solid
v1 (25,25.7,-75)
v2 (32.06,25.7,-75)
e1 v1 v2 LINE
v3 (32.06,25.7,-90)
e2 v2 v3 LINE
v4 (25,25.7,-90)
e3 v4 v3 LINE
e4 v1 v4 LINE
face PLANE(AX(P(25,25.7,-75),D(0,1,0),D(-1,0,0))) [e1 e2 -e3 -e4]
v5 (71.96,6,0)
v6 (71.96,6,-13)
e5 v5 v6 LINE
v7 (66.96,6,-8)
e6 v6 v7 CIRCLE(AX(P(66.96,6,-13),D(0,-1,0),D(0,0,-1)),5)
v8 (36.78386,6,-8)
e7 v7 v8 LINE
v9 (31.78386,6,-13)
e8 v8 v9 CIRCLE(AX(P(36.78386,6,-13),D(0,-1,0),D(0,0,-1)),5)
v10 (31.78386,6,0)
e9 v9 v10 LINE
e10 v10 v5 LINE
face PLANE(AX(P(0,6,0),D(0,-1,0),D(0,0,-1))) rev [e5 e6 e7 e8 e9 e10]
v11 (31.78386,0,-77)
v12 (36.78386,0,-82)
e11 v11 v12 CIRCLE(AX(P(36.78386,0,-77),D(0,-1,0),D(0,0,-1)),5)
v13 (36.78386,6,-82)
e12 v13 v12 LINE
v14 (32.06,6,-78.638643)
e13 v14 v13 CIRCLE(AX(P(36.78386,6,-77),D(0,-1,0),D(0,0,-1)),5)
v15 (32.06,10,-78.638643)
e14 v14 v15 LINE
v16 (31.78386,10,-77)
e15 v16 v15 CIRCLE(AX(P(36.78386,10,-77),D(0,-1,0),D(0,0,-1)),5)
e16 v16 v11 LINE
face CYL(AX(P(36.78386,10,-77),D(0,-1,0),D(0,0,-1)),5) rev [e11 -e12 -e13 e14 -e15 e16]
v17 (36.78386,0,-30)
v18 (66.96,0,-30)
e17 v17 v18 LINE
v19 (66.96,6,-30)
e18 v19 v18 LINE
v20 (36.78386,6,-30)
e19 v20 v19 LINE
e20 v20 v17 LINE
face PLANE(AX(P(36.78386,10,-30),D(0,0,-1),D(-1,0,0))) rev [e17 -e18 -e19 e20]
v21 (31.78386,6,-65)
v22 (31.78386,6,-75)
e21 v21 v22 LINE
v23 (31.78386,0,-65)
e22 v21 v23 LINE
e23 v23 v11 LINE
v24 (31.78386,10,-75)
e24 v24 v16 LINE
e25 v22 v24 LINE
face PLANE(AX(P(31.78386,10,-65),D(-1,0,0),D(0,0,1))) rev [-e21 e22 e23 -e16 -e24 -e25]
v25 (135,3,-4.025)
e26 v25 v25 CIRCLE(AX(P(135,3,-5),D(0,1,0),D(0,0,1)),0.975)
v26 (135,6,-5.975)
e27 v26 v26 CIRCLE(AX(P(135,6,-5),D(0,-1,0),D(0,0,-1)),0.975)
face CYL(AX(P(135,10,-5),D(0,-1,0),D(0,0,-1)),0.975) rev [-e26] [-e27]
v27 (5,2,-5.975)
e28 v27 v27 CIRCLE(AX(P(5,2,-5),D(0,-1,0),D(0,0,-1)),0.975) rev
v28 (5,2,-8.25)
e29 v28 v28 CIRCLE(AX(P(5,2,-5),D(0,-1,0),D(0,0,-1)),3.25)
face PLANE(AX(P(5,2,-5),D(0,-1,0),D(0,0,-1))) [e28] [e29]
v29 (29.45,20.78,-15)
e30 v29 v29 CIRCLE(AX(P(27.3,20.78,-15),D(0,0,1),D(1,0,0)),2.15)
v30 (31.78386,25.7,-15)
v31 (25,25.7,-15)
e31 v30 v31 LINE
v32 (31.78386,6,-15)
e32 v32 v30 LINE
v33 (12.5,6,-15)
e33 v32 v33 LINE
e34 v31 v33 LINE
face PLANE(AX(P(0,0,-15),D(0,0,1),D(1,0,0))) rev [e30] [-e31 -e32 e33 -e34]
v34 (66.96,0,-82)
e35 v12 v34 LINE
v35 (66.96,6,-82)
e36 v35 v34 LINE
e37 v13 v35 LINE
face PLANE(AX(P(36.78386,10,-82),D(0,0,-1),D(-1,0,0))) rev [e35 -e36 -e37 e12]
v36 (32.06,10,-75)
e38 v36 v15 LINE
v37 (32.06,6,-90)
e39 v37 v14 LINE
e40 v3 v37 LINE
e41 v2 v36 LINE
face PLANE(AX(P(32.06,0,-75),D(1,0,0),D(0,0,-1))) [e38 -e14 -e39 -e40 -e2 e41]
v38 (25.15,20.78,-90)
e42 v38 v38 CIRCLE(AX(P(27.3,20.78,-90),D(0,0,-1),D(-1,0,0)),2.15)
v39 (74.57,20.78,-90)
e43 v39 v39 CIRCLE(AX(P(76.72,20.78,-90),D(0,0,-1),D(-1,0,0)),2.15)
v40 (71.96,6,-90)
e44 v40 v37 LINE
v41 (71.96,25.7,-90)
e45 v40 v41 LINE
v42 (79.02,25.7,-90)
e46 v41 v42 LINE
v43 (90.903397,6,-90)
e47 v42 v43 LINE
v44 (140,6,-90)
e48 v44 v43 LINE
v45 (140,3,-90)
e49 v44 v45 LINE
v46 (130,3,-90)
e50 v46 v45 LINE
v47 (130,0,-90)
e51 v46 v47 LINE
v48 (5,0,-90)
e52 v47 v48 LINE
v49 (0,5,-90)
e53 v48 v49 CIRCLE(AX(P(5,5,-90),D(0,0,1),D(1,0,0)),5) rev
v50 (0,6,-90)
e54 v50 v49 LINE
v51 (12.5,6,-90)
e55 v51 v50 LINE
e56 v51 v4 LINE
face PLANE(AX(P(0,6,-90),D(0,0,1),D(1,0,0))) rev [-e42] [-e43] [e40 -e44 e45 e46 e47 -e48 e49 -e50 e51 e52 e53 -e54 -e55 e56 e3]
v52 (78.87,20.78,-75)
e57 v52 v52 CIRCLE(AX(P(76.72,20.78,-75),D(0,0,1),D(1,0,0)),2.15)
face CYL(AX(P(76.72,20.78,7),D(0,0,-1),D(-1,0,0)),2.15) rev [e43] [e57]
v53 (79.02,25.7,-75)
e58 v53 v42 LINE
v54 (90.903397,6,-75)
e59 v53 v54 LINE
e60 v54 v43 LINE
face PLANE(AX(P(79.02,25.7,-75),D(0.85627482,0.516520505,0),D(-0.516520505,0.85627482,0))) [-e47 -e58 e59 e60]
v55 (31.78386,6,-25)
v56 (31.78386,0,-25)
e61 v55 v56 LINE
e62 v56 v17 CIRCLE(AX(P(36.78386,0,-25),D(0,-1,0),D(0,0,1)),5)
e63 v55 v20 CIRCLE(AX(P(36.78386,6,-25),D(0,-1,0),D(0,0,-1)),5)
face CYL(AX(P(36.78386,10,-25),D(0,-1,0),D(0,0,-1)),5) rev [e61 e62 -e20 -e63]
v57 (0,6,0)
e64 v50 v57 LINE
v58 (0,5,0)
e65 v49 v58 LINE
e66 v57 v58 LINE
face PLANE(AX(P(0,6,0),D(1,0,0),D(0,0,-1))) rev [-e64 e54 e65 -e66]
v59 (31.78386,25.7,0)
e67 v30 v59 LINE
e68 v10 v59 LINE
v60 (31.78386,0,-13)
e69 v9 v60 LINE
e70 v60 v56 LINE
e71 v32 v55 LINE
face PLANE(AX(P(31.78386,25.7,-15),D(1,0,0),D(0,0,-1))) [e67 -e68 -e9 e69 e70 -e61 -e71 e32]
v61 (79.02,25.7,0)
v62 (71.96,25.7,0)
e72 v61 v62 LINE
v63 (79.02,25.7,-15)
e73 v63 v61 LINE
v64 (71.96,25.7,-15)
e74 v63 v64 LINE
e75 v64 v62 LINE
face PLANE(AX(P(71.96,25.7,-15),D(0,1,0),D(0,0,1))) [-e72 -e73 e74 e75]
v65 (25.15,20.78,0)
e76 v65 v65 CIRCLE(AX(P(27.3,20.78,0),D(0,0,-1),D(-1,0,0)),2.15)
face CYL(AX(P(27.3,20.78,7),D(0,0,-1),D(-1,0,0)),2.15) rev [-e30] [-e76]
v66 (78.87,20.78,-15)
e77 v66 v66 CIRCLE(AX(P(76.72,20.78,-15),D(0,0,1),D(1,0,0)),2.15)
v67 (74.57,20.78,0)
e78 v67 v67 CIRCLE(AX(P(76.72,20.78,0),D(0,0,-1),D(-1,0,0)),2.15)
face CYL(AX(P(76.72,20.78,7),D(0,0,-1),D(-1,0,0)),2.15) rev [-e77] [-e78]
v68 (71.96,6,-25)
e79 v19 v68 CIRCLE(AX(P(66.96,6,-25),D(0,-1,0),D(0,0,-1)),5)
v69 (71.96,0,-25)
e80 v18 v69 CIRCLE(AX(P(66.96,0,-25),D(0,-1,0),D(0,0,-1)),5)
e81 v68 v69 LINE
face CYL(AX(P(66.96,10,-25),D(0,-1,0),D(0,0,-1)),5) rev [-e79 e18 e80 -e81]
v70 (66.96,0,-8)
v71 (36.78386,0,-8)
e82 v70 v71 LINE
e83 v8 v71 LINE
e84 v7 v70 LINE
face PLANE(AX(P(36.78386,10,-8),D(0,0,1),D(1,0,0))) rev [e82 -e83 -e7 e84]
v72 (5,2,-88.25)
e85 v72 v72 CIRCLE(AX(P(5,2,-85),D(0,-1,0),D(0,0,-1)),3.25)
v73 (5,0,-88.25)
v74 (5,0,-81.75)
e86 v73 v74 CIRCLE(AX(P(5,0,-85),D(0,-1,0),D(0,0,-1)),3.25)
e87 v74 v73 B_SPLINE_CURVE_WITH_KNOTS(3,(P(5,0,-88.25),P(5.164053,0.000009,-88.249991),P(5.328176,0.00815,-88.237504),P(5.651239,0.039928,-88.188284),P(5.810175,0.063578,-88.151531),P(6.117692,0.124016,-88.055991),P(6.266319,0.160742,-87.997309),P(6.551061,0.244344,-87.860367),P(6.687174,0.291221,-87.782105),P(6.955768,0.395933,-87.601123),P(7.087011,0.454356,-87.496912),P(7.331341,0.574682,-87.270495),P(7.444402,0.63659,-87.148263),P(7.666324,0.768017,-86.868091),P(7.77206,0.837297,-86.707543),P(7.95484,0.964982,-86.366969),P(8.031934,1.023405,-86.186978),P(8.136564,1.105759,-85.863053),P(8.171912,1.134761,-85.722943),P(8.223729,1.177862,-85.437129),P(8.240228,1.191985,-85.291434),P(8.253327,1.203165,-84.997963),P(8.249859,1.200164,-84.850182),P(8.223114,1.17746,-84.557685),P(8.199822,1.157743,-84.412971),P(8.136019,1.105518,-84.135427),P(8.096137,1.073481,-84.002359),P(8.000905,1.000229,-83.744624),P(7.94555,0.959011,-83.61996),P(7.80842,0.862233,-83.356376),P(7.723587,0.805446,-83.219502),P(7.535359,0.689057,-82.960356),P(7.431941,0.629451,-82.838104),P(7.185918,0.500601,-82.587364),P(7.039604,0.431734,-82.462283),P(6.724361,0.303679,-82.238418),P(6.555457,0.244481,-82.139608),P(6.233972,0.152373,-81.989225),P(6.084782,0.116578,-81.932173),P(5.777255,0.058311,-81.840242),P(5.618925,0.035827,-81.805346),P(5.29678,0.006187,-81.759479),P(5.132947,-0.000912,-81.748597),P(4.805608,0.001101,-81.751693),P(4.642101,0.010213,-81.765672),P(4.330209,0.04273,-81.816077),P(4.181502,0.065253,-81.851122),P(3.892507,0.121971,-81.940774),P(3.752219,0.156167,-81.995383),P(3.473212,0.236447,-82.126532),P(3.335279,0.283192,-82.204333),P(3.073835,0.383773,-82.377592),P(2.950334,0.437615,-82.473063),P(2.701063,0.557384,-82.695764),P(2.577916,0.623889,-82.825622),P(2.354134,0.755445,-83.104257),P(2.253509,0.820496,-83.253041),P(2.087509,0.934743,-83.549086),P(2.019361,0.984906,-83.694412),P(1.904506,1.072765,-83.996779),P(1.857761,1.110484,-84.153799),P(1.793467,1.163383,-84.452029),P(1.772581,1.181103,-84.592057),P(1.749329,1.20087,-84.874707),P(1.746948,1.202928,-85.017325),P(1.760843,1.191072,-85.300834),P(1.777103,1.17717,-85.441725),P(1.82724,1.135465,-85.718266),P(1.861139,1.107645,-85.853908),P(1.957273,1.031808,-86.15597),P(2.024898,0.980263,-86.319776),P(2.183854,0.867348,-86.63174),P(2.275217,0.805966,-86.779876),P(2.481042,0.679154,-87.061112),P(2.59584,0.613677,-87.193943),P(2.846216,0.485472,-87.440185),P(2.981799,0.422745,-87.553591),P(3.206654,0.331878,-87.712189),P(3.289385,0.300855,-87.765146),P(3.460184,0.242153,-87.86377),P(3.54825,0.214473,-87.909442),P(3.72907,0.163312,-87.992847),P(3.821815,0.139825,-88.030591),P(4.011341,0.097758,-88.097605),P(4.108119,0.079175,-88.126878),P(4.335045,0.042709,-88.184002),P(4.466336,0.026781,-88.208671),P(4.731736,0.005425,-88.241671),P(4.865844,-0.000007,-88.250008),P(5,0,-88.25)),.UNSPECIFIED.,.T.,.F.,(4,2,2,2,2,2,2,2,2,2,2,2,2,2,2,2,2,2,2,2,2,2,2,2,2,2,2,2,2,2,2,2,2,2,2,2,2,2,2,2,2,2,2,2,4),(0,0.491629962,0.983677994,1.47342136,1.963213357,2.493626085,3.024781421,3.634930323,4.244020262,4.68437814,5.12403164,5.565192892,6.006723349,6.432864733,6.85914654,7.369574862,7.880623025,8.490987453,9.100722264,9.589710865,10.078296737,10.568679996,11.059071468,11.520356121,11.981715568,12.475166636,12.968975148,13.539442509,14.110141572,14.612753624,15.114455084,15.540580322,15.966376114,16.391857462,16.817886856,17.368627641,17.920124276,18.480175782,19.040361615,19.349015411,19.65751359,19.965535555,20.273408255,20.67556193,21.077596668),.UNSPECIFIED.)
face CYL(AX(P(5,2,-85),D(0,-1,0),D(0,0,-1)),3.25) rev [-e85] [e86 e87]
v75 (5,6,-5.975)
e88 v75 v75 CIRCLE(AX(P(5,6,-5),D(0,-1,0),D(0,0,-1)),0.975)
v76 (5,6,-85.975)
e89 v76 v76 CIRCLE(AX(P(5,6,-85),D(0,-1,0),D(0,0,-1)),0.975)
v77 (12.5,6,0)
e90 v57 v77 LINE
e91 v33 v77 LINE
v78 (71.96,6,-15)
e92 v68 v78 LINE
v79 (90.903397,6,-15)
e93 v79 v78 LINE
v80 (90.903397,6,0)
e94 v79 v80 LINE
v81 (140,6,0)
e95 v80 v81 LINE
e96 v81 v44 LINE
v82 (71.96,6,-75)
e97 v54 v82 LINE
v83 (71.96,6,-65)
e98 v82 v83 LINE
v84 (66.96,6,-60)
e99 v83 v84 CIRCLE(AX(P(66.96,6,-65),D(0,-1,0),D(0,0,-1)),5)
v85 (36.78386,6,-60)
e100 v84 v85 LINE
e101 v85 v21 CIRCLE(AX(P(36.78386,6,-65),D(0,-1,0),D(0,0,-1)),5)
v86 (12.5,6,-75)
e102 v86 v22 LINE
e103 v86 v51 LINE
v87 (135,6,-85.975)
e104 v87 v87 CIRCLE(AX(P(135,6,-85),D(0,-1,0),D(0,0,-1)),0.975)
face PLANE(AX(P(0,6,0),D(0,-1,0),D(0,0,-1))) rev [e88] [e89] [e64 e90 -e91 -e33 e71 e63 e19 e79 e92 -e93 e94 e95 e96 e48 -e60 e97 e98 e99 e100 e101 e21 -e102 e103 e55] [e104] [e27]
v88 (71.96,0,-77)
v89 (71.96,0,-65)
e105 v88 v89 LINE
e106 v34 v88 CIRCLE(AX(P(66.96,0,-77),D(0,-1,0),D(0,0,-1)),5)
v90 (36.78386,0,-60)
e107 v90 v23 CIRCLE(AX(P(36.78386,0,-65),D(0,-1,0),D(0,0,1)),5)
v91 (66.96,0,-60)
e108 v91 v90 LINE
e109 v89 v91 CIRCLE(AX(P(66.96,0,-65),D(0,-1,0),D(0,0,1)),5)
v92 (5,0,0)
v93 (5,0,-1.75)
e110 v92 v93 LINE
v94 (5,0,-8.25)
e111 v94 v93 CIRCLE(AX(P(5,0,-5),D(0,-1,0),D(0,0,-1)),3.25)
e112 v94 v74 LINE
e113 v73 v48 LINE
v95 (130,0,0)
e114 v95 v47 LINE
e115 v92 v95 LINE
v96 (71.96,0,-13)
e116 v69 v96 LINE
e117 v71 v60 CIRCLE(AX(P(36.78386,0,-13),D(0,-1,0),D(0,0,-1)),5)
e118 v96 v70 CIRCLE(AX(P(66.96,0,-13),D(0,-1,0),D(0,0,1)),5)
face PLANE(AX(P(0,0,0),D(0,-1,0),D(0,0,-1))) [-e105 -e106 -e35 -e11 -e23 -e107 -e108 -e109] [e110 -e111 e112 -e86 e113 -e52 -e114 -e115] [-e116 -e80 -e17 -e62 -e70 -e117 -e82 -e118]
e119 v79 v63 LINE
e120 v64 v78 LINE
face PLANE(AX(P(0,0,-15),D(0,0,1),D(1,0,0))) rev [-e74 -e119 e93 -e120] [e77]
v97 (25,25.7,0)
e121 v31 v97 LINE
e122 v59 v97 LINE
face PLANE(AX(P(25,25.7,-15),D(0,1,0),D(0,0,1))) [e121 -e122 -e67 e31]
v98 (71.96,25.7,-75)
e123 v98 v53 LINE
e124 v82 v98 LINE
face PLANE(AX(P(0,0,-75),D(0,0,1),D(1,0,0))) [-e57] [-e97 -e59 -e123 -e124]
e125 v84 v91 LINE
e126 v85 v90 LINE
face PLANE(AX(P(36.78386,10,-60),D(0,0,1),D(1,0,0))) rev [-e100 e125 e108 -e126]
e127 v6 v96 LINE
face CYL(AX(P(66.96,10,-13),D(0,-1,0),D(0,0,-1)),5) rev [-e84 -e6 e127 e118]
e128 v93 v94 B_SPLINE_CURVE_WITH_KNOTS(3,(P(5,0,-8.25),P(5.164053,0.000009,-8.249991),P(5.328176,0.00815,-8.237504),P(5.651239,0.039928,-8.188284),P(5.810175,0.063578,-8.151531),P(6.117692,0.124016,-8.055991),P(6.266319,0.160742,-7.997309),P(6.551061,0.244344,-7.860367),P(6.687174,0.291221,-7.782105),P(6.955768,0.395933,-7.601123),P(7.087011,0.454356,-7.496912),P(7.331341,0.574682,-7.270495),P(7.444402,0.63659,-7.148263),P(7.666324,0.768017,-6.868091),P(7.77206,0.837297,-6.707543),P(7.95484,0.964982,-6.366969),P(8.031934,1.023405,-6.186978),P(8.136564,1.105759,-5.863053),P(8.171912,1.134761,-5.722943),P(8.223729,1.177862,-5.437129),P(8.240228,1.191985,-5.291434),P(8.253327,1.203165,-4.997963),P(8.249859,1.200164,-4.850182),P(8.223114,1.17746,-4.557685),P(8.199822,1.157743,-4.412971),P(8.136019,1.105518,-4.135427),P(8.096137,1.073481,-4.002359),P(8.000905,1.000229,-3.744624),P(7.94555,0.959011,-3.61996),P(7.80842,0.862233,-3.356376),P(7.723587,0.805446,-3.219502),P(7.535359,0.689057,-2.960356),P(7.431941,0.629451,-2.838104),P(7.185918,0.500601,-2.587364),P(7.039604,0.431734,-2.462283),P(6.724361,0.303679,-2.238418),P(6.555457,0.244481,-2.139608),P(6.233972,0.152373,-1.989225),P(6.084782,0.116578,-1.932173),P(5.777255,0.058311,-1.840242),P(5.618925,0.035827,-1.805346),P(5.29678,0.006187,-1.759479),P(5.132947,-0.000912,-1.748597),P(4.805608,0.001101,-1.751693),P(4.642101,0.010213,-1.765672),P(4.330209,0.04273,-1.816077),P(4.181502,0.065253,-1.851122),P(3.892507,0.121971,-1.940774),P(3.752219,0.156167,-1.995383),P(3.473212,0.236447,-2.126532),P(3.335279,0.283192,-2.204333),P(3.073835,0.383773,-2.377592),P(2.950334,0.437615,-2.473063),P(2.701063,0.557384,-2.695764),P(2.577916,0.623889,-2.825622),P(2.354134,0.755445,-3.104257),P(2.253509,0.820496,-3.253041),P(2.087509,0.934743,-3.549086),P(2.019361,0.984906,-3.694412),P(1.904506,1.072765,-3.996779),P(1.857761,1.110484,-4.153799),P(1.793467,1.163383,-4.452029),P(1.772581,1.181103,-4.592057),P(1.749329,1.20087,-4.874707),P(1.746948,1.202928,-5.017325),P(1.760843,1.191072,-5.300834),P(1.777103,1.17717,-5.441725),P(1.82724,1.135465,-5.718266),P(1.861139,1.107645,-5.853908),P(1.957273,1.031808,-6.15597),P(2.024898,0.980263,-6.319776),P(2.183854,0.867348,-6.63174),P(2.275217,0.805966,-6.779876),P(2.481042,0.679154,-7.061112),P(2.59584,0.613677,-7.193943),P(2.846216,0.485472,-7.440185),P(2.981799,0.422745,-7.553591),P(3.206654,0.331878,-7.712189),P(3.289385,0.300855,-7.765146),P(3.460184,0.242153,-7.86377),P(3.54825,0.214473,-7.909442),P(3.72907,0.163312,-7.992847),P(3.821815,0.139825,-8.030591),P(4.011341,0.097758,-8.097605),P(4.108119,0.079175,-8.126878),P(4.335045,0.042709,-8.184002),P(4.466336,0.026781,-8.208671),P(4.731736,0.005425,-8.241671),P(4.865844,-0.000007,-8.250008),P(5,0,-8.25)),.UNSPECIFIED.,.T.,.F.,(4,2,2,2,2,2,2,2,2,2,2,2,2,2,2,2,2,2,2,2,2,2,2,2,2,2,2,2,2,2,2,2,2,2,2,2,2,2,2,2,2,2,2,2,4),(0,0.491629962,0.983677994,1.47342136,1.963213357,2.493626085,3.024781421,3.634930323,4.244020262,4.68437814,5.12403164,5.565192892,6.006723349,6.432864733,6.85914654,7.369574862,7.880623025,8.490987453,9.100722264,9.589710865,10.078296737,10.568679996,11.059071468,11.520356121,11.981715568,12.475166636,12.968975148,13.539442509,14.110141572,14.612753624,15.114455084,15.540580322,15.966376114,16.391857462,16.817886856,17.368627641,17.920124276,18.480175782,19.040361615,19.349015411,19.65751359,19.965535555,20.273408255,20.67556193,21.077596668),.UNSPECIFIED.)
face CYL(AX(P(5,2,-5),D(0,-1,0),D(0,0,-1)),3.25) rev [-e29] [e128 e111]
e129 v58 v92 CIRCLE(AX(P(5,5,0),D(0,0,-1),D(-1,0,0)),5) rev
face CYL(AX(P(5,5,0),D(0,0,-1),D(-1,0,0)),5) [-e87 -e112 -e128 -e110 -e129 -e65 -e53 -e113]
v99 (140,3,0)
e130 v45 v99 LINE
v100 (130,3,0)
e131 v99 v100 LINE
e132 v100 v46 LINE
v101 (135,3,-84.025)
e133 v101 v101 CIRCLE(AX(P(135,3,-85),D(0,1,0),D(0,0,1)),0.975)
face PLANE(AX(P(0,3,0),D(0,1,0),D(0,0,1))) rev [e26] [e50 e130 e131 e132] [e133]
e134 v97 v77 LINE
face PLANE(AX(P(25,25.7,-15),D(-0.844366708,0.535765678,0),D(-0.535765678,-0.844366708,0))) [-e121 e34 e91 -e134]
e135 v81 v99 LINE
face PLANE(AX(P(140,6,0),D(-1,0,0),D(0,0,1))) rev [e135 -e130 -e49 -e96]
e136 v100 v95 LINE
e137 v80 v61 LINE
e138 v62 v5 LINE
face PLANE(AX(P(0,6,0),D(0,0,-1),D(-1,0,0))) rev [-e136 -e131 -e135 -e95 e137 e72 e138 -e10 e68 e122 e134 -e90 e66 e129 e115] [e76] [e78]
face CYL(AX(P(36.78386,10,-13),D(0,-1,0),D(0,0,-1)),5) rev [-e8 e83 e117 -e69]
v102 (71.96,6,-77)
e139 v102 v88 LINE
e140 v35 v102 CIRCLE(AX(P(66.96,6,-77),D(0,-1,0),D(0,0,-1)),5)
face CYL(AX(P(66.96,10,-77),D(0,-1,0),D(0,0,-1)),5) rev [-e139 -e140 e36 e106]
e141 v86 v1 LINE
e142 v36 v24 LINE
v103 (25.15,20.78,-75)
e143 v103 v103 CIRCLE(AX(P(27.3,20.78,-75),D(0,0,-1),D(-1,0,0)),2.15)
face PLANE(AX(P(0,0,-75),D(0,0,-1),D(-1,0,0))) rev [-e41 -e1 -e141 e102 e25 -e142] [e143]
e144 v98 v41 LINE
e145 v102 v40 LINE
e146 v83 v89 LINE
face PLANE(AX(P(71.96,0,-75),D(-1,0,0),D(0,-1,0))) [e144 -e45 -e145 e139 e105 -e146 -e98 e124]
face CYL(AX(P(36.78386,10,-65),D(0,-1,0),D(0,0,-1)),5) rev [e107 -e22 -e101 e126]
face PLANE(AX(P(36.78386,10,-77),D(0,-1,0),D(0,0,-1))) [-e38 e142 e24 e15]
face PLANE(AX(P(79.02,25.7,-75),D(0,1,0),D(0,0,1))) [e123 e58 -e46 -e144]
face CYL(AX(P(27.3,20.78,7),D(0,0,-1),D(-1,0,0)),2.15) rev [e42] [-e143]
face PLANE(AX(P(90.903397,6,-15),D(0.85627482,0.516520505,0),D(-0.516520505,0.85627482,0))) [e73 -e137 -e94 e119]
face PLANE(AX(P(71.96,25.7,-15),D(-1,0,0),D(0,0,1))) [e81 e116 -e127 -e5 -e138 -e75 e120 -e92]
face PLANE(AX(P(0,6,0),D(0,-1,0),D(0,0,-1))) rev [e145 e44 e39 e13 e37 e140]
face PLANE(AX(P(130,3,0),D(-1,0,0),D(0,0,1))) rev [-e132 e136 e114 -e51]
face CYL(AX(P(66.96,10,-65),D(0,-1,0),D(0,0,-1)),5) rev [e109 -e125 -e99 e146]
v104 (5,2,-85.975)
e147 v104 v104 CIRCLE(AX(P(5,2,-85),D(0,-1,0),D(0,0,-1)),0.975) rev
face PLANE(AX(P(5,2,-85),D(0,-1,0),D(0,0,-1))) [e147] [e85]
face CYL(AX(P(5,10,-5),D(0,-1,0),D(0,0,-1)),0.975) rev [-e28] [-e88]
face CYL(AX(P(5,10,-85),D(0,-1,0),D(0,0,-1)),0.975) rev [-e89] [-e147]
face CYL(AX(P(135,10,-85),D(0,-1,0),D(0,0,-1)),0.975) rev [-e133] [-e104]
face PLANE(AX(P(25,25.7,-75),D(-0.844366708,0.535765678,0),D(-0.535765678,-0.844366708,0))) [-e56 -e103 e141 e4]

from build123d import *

# Parameters (mm, degrees)
SKIZZE1_W                             = 140
SKIZZE1_H                             = 90
AUFSATZ_LINEAR_AUSTRAGEN1_DEPTH       = 6
SKIZZE2_W                             = 10
SKIZZE2_H                             = 90
SCHNITT_LINEAR_AUSTRAGEN1_DEPTH       = 3
SKIZZE3_W                             = 7.06
SKIZZE3_H                             = 25.7
SKIZZE3_R                             = 2.1
AUFSATZ_LINEAR_AUSTRAGEN2_DEPTH       = 15
AUFSATZ_LINEAR_START                  = -15
SKIZZE4_W                             = 6.783859635
SKIZZE4_H                             = 25.7
SKIZZE4_R                             = 2.1
SKIZZE4_W_2                           = 7.06
AUFSATZ_LINEAR_AUSTRAGEN3_DEPTH       = 15
VERRUNDUNG1_R                         = 5
SCHNITT_LINEAR_AUSTRAGEN2_DEPTH       = 10
SKIZZE6_R                             = 0.975
SCHNITT_LINEAR_AUSTRAGEN3_DEPTH       = 10
SKIZZE7_R                             = 3.25
SCHNITT_LINEAR_AUSTRAGEN4_DEPTH       = 2
AUFSATZ_LINEAR_START_2                = -90
AUFSATZ_LINEAR_AUSTRAGEN4_OUTLINE_R   = 2.15
AUFSATZ_LINEAR_AUSTRAGEN4_OUTLINE_R_2 = 2.1
AUFSATZ_LINEAR_AUSTRAGEN4_DEPTH       = 90
AUFSATZ_LINEAR_AUSTRAGEN4_2_DEPTH     = 15
AUFSATZ_LINEAR_AUSTRAGEN5_DEPTH       = 15
AUFSATZ_LINEAR_AUSTRAGEN6_DEPTH       = 15


# Read off the part's stored shape, not the designer's step: Aufsatz-Linear austragen4
with BuildPart() as part:
    # Skizze1 → Aufsatz-Linear austragen1 (new body)
    with BuildSketch(Plane(origin=(0, 0, 0), x_dir=(1, 0, 0), z_dir=(0, 1, 0))):
        with Locations((70, 45)):
            Rectangle(SKIZZE1_W, SKIZZE1_H)
    extrude(amount=AUFSATZ_LINEAR_AUSTRAGEN1_DEPTH)

    # Skizze2 → Schnitt-Linear austragen1 (cut)
    with BuildSketch(Plane.XZ):
        with Locations((135, -45)):
            Rectangle(SKIZZE2_W, SKIZZE2_H)
    extrude(amount=-SCHNITT_LINEAR_AUSTRAGEN1_DEPTH, mode=Mode.SUBTRACT)

    # Skizze3 → Aufsatz-Linear austragen2 (add)
    # profile 1 of 2: a face of its own
    with BuildSketch(Plane(origin=(0, 0, -90), x_dir=(-1, 0, 0), z_dir=(0, 0, -1))):
        with Locations((-75.49, 12.85)):
            Rectangle(SKIZZE3_W, SKIZZE3_H)
        with Locations((-76.72, 20.78)):
            Circle(SKIZZE3_R, mode=Mode.SUBTRACT)
    # profile 2 of 2: a face of its own
    with BuildSketch(Plane(origin=(0, 0, -90), x_dir=(-1, 0, 0), z_dir=(0, 0, -1))):
        with Locations((-28.53, 12.85)):
            Rectangle(SKIZZE3_W, SKIZZE3_H)
        with Locations((-27.3, 20.78)):
            Circle(SKIZZE3_R, mode=Mode.SUBTRACT)
    extrude(amount=-AUFSATZ_LINEAR_AUSTRAGEN2_DEPTH)

    # Skizze4 → Aufsatz-Linear austragen3 (add)
    # profile 1 of 2: a face of its own
    with BuildSketch(Plane.XY.offset(AUFSATZ_LINEAR_START)):
        with Locations((28.391929817, 12.85)):
            Rectangle(SKIZZE4_W, SKIZZE4_H)
        with Locations(Location((27.3, 20.78, 0), (0, 0, 180))):
            Circle(SKIZZE4_R, mode=Mode.SUBTRACT)
    # profile 2 of 2: a face of its own
    with BuildSketch(Plane.XY.offset(AUFSATZ_LINEAR_START)):
        with Locations((75.49, 12.85)):
            Rectangle(SKIZZE4_W_2, SKIZZE4_H)
        with Locations(Location((76.72, 20.78, 0), (0, 0, 180))):
            Circle(SKIZZE4_R, mode=Mode.SUBTRACT)
    extrude(amount=AUFSATZ_LINEAR_AUSTRAGEN3_DEPTH)

    # Verrundung1
    verrundung1_edges = [part.edges().sort_by_distance(p)[0] for p in [
        (0, 0, -45),
    ]]
    fillet(verrundung1_edges, radius=VERRUNDUNG1_R)

    # Skizze5 → Schnitt-Linear austragen2 (cut)
    with BuildSketch(Plane(origin=(0, 0, 0), x_dir=(-1, 0, 0), z_dir=(0, -1, 0))):
        with BuildLine():
            Line((-36.783859635, 8), (-66.96, 8))
            ThreePointArc((-66.96, 8), (-70.495533906, 9.464466094), (-71.96, 13))
            Line((-71.96, 13), (-71.96, 25))
            ThreePointArc((-71.96, 25), (-70.495533906, 28.535533906), (-66.96, 30))
            Line((-66.96, 30), (-36.783859635, 30))
            ThreePointArc((-36.783859635, 30), (-33.248325729, 28.535533906), (-31.783859635, 25))
            Line((-31.783859635, 25), (-31.783859635, 13))
            ThreePointArc((-31.783859635, 13), (-33.248325729, 9.464466094), (-36.783859635, 8))
        make_face()
        with BuildLine():
            Line((-36.783859635, 82), (-66.96, 82))
            ThreePointArc((-66.96, 82), (-70.495533906, 80.535533906), (-71.96, 77))
            Line((-71.96, 77), (-71.96, 65))
            ThreePointArc((-71.96, 65), (-70.495533906, 61.464466094), (-66.96, 60))
            Line((-66.96, 60), (-36.783859635, 60))
            ThreePointArc((-36.783859635, 60), (-33.248325729, 61.464466094), (-31.783859635, 65))
            Line((-31.783859635, 65), (-31.783859635, 77))
            ThreePointArc((-31.783859635, 77), (-33.248325729, 80.535533906), (-36.783859635, 82))
        make_face()
    extrude(amount=-SCHNITT_LINEAR_AUSTRAGEN2_DEPTH, mode=Mode.SUBTRACT)

    # Skizze6 → Schnitt-Linear austragen3 (cut)
    with BuildSketch(Plane.XZ):
        with Locations(Location((135, -5, 0), (0, 0, 270))):
            Circle(SKIZZE6_R)
        with Locations(Location((5, -85, 0), (0, 0, 270))):
            Circle(SKIZZE6_R)
        with Locations(Location((135, -85, 0), (0, 0, 270))):
            Circle(SKIZZE6_R)
        with Locations(Location((5, -5, 0), (0, 0, 270))):
            Circle(SKIZZE6_R)
    extrude(amount=-SCHNITT_LINEAR_AUSTRAGEN3_DEPTH, mode=Mode.SUBTRACT)

    # Skizze7 → Schnitt-Linear austragen4 (cut)
    with BuildSketch(Plane.XZ):
        with Locations(Location((5, -5, 0), (0, 0, 270))):
            Circle(SKIZZE7_R)
        with Locations(Location((5, -85, 0), (0, 0, 270))):
            Circle(SKIZZE7_R)
    extrude(amount=-SCHNITT_LINEAR_AUSTRAGEN4_DEPTH, mode=Mode.SUBTRACT)

    # Aufsatz-Linear austragen4 outline → Aufsatz-Linear austragen4 (cut)
    # profile 1 of 2: a face of its own
    with BuildSketch(Plane(origin=(0, 0, -90), x_dir=(-1, 0, 0), z_dir=(0, 0, -1)).offset(AUFSATZ_LINEAR_START_2)):
        with Locations((-76.72, 20.78)):
            Circle(AUFSATZ_LINEAR_AUSTRAGEN4_OUTLINE_R)
        with Locations((-76.72, 20.78)):
            Circle(AUFSATZ_LINEAR_AUSTRAGEN4_OUTLINE_R_2, mode=Mode.SUBTRACT)
    # profile 2 of 2: a face of its own
    with BuildSketch(Plane(origin=(0, 0, -90), x_dir=(-1, 0, 0), z_dir=(0, 0, -1)).offset(AUFSATZ_LINEAR_START_2)):
        with Locations((-27.3, 20.78)):
            Circle(AUFSATZ_LINEAR_AUSTRAGEN4_OUTLINE_R)
        with Locations((-27.3, 20.78)):
            Circle(AUFSATZ_LINEAR_AUSTRAGEN4_OUTLINE_R_2, mode=Mode.SUBTRACT)
    extrude(amount=AUFSATZ_LINEAR_AUSTRAGEN4_DEPTH, mode=Mode.SUBTRACT)

    # Aufsatz-Linear austragen4 2 outline → Aufsatz-Linear austragen4 2 (add)
    with BuildSketch(Plane(origin=(0, 0, -90), x_dir=(-1, 0, 0), z_dir=(0, 0, -1)).offset(AUFSATZ_LINEAR_START)):
        Polygon((-79.02, 6), (-79.02, 25.7), (-90.903397377, 6), align=None)
    extrude(amount=AUFSATZ_LINEAR_AUSTRAGEN4_2_DEPTH)

    # Skizze10 → Aufsatz-Linear austragen5 (add)
    with BuildSketch(Plane(origin=(0, 0, -90), x_dir=(-1, 0, 0), z_dir=(0, 0, -1))):
        Polygon((-25, 25.7), (-12.5, 6), (-25, 6), align=None)
    extrude(amount=-AUFSATZ_LINEAR_AUSTRAGEN5_DEPTH)

    # Skizze11 → Aufsatz-Linear austragen6 (add)
    with BuildSketch(Plane.XY):
        Polygon((25, 25.7), (12.5, 6), (25, 6), align=None)
        Polygon((79.02, 25.7), (79.02, 6), (90.903397377, 6), align=None)
    extrude(amount=-AUFSATZ_LINEAR_AUSTRAGEN6_DEPTH)


solid = part.part
